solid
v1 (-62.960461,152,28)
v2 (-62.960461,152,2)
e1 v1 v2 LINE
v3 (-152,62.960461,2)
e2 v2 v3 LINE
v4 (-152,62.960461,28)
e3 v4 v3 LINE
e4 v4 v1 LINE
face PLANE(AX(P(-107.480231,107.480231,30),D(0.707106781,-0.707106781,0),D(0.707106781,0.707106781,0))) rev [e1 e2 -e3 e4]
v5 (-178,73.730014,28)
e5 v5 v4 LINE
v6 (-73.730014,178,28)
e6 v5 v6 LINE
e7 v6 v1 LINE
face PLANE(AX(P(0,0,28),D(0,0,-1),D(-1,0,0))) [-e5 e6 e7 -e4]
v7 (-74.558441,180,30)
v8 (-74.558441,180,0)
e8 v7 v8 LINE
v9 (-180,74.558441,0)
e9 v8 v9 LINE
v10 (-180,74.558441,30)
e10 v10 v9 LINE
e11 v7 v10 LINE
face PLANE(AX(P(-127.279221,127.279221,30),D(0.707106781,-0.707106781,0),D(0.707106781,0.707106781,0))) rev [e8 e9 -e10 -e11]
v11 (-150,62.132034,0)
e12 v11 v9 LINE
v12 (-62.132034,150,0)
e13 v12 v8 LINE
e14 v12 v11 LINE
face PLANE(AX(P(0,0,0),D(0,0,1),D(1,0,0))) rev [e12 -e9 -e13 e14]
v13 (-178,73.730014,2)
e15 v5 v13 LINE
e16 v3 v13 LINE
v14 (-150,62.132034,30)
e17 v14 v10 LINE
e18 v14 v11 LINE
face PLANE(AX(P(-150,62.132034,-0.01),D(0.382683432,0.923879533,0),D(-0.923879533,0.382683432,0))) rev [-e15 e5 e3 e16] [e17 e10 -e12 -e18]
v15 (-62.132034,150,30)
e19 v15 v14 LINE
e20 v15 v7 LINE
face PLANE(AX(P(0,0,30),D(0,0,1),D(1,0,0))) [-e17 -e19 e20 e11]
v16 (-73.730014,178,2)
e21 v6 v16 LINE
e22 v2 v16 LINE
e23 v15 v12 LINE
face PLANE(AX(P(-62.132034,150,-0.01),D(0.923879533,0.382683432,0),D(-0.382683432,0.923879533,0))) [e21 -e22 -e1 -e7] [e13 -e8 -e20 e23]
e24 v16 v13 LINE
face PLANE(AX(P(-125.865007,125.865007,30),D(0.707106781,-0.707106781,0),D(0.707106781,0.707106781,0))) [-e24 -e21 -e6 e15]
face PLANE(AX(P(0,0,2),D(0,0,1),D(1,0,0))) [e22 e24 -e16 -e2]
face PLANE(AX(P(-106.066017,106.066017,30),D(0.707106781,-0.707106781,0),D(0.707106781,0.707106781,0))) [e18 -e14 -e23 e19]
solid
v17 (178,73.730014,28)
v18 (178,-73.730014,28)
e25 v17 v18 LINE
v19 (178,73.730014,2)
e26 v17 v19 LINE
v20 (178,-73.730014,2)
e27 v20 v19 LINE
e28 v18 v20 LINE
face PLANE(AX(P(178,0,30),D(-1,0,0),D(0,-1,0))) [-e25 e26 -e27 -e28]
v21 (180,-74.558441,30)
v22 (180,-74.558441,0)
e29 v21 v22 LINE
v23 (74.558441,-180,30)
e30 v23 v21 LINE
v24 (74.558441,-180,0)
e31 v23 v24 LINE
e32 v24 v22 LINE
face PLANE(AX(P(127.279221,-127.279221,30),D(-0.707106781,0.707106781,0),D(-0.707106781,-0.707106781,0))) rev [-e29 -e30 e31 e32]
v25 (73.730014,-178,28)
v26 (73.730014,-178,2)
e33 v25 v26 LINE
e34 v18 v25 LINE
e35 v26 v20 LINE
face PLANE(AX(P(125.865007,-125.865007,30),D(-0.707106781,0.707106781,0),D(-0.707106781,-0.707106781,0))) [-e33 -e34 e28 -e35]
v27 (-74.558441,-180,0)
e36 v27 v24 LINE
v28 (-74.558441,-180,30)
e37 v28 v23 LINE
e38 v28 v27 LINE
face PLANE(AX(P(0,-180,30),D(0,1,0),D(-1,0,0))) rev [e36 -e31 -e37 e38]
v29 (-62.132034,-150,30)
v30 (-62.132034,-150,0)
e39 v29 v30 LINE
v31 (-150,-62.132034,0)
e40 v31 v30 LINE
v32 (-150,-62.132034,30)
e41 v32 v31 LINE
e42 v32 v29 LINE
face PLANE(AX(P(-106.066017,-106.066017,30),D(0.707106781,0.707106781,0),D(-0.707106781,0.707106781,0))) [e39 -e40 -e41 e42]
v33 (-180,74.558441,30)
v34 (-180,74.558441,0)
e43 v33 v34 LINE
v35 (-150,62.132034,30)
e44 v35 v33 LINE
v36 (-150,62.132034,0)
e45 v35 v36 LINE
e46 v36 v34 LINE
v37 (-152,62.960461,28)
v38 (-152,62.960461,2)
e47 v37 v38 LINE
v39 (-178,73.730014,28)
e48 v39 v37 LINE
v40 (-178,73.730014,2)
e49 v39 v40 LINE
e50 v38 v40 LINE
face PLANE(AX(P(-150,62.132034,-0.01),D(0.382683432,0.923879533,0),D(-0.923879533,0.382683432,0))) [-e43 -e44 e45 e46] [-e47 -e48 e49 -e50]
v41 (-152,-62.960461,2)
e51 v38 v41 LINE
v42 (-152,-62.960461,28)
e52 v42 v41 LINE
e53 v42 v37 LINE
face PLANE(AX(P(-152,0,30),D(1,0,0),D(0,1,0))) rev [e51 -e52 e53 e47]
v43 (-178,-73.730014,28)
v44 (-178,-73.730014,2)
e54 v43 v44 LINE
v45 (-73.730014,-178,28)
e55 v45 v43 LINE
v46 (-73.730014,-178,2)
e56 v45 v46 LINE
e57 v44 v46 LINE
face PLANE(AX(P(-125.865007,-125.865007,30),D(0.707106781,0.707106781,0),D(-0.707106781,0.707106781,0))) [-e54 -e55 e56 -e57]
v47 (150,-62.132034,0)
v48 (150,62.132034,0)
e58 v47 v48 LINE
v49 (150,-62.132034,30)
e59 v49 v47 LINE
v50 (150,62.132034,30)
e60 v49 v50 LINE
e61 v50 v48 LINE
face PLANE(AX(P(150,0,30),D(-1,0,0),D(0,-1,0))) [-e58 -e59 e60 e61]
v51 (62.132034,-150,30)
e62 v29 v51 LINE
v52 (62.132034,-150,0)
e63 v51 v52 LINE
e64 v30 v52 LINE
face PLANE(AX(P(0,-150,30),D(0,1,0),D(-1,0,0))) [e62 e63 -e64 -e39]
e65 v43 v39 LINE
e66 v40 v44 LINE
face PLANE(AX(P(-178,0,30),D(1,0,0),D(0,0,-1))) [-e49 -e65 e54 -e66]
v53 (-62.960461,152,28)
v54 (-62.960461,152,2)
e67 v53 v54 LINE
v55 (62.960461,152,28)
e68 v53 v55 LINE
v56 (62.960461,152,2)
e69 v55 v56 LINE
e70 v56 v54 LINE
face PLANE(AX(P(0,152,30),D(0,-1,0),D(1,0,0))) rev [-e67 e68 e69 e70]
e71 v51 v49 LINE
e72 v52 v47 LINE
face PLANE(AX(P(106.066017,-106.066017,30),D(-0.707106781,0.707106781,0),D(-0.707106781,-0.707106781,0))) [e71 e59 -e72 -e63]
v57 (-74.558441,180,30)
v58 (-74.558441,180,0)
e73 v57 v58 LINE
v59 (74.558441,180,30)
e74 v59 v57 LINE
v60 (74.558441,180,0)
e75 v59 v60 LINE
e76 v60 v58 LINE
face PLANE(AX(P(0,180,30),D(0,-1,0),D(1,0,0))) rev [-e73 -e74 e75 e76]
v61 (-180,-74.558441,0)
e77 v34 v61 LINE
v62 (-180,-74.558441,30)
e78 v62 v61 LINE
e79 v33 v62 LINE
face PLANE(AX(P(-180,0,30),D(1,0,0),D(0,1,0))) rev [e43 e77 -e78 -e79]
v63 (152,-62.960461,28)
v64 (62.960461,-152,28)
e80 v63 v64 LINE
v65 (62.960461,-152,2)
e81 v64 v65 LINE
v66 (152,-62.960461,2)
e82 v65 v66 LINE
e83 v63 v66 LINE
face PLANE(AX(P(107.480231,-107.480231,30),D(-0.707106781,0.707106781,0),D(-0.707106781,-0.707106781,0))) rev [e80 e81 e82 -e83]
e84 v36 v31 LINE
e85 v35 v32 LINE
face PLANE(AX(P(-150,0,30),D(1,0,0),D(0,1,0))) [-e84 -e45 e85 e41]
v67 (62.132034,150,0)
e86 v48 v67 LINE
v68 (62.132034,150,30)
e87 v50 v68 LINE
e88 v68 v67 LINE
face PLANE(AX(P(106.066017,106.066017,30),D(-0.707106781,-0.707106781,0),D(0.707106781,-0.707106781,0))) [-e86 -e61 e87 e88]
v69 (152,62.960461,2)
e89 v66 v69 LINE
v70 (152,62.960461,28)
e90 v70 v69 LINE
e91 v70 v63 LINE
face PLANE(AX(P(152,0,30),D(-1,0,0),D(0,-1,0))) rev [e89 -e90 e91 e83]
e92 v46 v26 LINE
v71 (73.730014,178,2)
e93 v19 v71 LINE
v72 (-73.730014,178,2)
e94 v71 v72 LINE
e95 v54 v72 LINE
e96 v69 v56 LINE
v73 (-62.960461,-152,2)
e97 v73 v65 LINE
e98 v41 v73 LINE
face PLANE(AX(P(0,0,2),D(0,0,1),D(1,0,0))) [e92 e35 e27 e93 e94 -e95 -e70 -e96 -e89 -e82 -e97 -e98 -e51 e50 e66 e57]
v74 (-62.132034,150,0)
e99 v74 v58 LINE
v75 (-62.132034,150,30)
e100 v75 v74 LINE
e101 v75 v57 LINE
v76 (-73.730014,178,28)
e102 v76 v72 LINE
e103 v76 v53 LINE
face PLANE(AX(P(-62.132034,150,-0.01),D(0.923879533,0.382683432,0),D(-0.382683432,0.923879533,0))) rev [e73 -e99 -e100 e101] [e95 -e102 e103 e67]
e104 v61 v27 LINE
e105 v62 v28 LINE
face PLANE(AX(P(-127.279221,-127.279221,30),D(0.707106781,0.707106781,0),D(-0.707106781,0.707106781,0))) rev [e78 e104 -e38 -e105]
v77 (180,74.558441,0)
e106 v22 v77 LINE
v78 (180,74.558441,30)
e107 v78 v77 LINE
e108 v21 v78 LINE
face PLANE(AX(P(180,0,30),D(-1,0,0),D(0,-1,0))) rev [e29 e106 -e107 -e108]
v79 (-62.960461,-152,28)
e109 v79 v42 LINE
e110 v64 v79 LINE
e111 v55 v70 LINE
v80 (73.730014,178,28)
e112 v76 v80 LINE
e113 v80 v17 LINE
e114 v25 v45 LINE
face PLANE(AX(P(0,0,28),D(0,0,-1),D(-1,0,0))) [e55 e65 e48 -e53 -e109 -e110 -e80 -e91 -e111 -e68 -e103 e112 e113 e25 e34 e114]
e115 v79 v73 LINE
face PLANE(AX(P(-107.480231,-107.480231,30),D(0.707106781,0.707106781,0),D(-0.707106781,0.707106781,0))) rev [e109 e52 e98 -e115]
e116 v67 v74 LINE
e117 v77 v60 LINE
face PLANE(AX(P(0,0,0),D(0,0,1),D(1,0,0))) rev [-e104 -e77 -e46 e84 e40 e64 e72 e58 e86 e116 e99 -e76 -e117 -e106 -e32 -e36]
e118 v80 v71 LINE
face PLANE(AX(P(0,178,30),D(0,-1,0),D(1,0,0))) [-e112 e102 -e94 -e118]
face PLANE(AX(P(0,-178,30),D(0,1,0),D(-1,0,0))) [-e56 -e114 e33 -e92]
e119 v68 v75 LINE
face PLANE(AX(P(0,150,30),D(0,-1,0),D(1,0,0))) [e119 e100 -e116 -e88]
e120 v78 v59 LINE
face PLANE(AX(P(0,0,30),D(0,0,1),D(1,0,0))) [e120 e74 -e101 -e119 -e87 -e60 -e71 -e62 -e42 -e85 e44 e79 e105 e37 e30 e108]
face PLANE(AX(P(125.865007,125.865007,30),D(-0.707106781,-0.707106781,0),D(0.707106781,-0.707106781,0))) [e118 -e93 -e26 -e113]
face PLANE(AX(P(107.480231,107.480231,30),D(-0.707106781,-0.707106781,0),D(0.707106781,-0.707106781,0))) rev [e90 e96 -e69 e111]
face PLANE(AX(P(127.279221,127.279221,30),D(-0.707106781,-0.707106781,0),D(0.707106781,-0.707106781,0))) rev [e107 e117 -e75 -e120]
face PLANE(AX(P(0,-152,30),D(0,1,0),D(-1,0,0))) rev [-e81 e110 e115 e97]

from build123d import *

# Parameters (mm, degrees)
RESSALTO_EXTRUS_O1_DEPTH   = 30
RESSALTO_EXTRUS_O1_2_DEPTH = 30
RESSALTO_EXTRUS_O2_DEPTH   = 2
RESSALTO_EXTRUS_O3_START   = 30
RESSALTO_EXTRUS_O3_DEPTH   = 2
DIVIDIR1_DEPTH             = 30
DIVIDIR1_2_DEPTH           = 30
DIVIDIR1_3_DEPTH           = 2
DIVIDIR1_START             = 28
DIVIDIR1_4_DEPTH           = 2


# Read off the part's stored shape, not the designer's step: Dividir1
with BuildPart() as part:
    # Esboço2 → Ressalto-extrusão1 (new body)
    with BuildSketch(Plane.XY):
        Polygon((74.558441227, -180), (180, -74.558441227), (180, 74.558441227), (74.558441227, 180), (-74.558441227, 180), (-180, 74.558441227), (-180, -74.558441227), (-74.558441227, -180), align=None)
        Polygon((178, -73.730014102), (178, 73.730014102), (73.730014102, 178), (-73.730014102, 178), (-178, 73.730014102), (-178, -73.730014102), (-73.730014102, -178), (73.730014102, -178), align=None, mode=Mode.SUBTRACT)
    extrude(amount=RESSALTO_EXTRUS_O1_DEPTH)



with BuildPart() as body_2:
    # Esboço2 → Ressalto-extrus_o1 2 (new body)
    with BuildSketch(Plane.XY):
        Polygon((62.960461481, -152), (152, -62.960461481), (152, 62.960461481), (62.960461481, 152), (-62.960461481, 152), (-152, 62.960461481), (-152, -62.960461481), (-62.960461481, -152), align=None)
        Polygon((150, -62.132034356), (150, 62.132034356), (62.132034356, 150), (-62.132034356, 150), (-150, 62.132034356), (-150, -62.132034356), (-62.132034356, -150), (62.132034356, -150), align=None, mode=Mode.SUBTRACT)
    extrude(amount=RESSALTO_EXTRUS_O1_2_DEPTH)


with BuildPart() as part_1:
    add(part.part)

    add(body_2.part)  # Ressalto-extrusão2 merges body 2
    # Esboço2<4> → Ressalto-extrusão2 (add)
    with BuildSketch(Plane.XY):
        Polygon((73.730014102, -178), (178, -73.730014102), (178, 73.730014102), (73.730014102, 178), (-73.730014102, 178), (-178, 73.730014102), (-178, -73.730014102), (-73.730014102, -178), align=None)
        Polygon((152, -62.960461481), (152, 62.960461481), (62.960461481, 152), (-62.960461481, 152), (-152, 62.960461481), (-152, -62.960461481), (-62.960461481, -152), (62.960461481, -152), align=None, mode=Mode.SUBTRACT)
    extrude(amount=RESSALTO_EXTRUS_O2_DEPTH)

    # Esboço2<7> → Ressalto-extrusão3 (add)
    with BuildSketch(Plane.XY.offset(RESSALTO_EXTRUS_O3_START)):
        Polygon((73.730014102, -178), (178, -73.730014102), (178, 73.730014102), (73.730014102, 178), (-73.730014102, 178), (-178, 73.730014102), (-178, -73.730014102), (-73.730014102, -178), align=None)
        Polygon((152, -62.960461481), (152, 62.960461481), (62.960461481, 152), (-62.960461481, 152), (-152, 62.960461481), (-152, -62.960461481), (-62.960461481, -152), (62.960461481, -152), align=None, mode=Mode.SUBTRACT)
    extrude(amount=-RESSALTO_EXTRUS_O3_DEPTH)

    # Dividir1 outline → Dividir1 (cut)
    with BuildSketch(Plane.XY):
        Polygon((-150, 62.132034356), (-62.132034356, 150), (-74.558441227, 180), (-180, 74.558441227), align=None)
    extrude(amount=DIVIDIR1_DEPTH, mode=Mode.SUBTRACT)


with BuildPart() as body_2_2:
    # Dividir1 2 outline → Dividir1 2 (new body)
    with BuildSketch(Plane.XY):
        Polygon((-152, 62.960461481), (-150, 62.132034356), (-62.132034356, 150), (-62.960461481, 152), align=None)
        Polygon((-180, 74.558441227), (-178, 73.730014102), (-73.730014102, 178), (-74.558441227, 180), align=None)
    extrude(amount=DIVIDIR1_2_DEPTH)

    # Dividir1 3 outline → Dividir1 3 (add)
    with BuildSketch(Plane.XY):
        Polygon((-178, 73.730014102), (-152, 62.960461481), (-62.960461481, 152), (-73.730014102, 178), align=None)
    extrude(amount=DIVIDIR1_3_DEPTH)

    # Dividir1 4 outline → Dividir1 4 (add)
    with BuildSketch(Plane.XY.offset(DIVIDIR1_START)):
        Polygon((-178, 73.730014102), (-152, 62.960461481), (-62.960461481, 152), (-73.730014102, 178), align=None)
    extrude(amount=DIVIDIR1_4_DEPTH)


solid = Compound([part_1.part, body_2_2.part])
